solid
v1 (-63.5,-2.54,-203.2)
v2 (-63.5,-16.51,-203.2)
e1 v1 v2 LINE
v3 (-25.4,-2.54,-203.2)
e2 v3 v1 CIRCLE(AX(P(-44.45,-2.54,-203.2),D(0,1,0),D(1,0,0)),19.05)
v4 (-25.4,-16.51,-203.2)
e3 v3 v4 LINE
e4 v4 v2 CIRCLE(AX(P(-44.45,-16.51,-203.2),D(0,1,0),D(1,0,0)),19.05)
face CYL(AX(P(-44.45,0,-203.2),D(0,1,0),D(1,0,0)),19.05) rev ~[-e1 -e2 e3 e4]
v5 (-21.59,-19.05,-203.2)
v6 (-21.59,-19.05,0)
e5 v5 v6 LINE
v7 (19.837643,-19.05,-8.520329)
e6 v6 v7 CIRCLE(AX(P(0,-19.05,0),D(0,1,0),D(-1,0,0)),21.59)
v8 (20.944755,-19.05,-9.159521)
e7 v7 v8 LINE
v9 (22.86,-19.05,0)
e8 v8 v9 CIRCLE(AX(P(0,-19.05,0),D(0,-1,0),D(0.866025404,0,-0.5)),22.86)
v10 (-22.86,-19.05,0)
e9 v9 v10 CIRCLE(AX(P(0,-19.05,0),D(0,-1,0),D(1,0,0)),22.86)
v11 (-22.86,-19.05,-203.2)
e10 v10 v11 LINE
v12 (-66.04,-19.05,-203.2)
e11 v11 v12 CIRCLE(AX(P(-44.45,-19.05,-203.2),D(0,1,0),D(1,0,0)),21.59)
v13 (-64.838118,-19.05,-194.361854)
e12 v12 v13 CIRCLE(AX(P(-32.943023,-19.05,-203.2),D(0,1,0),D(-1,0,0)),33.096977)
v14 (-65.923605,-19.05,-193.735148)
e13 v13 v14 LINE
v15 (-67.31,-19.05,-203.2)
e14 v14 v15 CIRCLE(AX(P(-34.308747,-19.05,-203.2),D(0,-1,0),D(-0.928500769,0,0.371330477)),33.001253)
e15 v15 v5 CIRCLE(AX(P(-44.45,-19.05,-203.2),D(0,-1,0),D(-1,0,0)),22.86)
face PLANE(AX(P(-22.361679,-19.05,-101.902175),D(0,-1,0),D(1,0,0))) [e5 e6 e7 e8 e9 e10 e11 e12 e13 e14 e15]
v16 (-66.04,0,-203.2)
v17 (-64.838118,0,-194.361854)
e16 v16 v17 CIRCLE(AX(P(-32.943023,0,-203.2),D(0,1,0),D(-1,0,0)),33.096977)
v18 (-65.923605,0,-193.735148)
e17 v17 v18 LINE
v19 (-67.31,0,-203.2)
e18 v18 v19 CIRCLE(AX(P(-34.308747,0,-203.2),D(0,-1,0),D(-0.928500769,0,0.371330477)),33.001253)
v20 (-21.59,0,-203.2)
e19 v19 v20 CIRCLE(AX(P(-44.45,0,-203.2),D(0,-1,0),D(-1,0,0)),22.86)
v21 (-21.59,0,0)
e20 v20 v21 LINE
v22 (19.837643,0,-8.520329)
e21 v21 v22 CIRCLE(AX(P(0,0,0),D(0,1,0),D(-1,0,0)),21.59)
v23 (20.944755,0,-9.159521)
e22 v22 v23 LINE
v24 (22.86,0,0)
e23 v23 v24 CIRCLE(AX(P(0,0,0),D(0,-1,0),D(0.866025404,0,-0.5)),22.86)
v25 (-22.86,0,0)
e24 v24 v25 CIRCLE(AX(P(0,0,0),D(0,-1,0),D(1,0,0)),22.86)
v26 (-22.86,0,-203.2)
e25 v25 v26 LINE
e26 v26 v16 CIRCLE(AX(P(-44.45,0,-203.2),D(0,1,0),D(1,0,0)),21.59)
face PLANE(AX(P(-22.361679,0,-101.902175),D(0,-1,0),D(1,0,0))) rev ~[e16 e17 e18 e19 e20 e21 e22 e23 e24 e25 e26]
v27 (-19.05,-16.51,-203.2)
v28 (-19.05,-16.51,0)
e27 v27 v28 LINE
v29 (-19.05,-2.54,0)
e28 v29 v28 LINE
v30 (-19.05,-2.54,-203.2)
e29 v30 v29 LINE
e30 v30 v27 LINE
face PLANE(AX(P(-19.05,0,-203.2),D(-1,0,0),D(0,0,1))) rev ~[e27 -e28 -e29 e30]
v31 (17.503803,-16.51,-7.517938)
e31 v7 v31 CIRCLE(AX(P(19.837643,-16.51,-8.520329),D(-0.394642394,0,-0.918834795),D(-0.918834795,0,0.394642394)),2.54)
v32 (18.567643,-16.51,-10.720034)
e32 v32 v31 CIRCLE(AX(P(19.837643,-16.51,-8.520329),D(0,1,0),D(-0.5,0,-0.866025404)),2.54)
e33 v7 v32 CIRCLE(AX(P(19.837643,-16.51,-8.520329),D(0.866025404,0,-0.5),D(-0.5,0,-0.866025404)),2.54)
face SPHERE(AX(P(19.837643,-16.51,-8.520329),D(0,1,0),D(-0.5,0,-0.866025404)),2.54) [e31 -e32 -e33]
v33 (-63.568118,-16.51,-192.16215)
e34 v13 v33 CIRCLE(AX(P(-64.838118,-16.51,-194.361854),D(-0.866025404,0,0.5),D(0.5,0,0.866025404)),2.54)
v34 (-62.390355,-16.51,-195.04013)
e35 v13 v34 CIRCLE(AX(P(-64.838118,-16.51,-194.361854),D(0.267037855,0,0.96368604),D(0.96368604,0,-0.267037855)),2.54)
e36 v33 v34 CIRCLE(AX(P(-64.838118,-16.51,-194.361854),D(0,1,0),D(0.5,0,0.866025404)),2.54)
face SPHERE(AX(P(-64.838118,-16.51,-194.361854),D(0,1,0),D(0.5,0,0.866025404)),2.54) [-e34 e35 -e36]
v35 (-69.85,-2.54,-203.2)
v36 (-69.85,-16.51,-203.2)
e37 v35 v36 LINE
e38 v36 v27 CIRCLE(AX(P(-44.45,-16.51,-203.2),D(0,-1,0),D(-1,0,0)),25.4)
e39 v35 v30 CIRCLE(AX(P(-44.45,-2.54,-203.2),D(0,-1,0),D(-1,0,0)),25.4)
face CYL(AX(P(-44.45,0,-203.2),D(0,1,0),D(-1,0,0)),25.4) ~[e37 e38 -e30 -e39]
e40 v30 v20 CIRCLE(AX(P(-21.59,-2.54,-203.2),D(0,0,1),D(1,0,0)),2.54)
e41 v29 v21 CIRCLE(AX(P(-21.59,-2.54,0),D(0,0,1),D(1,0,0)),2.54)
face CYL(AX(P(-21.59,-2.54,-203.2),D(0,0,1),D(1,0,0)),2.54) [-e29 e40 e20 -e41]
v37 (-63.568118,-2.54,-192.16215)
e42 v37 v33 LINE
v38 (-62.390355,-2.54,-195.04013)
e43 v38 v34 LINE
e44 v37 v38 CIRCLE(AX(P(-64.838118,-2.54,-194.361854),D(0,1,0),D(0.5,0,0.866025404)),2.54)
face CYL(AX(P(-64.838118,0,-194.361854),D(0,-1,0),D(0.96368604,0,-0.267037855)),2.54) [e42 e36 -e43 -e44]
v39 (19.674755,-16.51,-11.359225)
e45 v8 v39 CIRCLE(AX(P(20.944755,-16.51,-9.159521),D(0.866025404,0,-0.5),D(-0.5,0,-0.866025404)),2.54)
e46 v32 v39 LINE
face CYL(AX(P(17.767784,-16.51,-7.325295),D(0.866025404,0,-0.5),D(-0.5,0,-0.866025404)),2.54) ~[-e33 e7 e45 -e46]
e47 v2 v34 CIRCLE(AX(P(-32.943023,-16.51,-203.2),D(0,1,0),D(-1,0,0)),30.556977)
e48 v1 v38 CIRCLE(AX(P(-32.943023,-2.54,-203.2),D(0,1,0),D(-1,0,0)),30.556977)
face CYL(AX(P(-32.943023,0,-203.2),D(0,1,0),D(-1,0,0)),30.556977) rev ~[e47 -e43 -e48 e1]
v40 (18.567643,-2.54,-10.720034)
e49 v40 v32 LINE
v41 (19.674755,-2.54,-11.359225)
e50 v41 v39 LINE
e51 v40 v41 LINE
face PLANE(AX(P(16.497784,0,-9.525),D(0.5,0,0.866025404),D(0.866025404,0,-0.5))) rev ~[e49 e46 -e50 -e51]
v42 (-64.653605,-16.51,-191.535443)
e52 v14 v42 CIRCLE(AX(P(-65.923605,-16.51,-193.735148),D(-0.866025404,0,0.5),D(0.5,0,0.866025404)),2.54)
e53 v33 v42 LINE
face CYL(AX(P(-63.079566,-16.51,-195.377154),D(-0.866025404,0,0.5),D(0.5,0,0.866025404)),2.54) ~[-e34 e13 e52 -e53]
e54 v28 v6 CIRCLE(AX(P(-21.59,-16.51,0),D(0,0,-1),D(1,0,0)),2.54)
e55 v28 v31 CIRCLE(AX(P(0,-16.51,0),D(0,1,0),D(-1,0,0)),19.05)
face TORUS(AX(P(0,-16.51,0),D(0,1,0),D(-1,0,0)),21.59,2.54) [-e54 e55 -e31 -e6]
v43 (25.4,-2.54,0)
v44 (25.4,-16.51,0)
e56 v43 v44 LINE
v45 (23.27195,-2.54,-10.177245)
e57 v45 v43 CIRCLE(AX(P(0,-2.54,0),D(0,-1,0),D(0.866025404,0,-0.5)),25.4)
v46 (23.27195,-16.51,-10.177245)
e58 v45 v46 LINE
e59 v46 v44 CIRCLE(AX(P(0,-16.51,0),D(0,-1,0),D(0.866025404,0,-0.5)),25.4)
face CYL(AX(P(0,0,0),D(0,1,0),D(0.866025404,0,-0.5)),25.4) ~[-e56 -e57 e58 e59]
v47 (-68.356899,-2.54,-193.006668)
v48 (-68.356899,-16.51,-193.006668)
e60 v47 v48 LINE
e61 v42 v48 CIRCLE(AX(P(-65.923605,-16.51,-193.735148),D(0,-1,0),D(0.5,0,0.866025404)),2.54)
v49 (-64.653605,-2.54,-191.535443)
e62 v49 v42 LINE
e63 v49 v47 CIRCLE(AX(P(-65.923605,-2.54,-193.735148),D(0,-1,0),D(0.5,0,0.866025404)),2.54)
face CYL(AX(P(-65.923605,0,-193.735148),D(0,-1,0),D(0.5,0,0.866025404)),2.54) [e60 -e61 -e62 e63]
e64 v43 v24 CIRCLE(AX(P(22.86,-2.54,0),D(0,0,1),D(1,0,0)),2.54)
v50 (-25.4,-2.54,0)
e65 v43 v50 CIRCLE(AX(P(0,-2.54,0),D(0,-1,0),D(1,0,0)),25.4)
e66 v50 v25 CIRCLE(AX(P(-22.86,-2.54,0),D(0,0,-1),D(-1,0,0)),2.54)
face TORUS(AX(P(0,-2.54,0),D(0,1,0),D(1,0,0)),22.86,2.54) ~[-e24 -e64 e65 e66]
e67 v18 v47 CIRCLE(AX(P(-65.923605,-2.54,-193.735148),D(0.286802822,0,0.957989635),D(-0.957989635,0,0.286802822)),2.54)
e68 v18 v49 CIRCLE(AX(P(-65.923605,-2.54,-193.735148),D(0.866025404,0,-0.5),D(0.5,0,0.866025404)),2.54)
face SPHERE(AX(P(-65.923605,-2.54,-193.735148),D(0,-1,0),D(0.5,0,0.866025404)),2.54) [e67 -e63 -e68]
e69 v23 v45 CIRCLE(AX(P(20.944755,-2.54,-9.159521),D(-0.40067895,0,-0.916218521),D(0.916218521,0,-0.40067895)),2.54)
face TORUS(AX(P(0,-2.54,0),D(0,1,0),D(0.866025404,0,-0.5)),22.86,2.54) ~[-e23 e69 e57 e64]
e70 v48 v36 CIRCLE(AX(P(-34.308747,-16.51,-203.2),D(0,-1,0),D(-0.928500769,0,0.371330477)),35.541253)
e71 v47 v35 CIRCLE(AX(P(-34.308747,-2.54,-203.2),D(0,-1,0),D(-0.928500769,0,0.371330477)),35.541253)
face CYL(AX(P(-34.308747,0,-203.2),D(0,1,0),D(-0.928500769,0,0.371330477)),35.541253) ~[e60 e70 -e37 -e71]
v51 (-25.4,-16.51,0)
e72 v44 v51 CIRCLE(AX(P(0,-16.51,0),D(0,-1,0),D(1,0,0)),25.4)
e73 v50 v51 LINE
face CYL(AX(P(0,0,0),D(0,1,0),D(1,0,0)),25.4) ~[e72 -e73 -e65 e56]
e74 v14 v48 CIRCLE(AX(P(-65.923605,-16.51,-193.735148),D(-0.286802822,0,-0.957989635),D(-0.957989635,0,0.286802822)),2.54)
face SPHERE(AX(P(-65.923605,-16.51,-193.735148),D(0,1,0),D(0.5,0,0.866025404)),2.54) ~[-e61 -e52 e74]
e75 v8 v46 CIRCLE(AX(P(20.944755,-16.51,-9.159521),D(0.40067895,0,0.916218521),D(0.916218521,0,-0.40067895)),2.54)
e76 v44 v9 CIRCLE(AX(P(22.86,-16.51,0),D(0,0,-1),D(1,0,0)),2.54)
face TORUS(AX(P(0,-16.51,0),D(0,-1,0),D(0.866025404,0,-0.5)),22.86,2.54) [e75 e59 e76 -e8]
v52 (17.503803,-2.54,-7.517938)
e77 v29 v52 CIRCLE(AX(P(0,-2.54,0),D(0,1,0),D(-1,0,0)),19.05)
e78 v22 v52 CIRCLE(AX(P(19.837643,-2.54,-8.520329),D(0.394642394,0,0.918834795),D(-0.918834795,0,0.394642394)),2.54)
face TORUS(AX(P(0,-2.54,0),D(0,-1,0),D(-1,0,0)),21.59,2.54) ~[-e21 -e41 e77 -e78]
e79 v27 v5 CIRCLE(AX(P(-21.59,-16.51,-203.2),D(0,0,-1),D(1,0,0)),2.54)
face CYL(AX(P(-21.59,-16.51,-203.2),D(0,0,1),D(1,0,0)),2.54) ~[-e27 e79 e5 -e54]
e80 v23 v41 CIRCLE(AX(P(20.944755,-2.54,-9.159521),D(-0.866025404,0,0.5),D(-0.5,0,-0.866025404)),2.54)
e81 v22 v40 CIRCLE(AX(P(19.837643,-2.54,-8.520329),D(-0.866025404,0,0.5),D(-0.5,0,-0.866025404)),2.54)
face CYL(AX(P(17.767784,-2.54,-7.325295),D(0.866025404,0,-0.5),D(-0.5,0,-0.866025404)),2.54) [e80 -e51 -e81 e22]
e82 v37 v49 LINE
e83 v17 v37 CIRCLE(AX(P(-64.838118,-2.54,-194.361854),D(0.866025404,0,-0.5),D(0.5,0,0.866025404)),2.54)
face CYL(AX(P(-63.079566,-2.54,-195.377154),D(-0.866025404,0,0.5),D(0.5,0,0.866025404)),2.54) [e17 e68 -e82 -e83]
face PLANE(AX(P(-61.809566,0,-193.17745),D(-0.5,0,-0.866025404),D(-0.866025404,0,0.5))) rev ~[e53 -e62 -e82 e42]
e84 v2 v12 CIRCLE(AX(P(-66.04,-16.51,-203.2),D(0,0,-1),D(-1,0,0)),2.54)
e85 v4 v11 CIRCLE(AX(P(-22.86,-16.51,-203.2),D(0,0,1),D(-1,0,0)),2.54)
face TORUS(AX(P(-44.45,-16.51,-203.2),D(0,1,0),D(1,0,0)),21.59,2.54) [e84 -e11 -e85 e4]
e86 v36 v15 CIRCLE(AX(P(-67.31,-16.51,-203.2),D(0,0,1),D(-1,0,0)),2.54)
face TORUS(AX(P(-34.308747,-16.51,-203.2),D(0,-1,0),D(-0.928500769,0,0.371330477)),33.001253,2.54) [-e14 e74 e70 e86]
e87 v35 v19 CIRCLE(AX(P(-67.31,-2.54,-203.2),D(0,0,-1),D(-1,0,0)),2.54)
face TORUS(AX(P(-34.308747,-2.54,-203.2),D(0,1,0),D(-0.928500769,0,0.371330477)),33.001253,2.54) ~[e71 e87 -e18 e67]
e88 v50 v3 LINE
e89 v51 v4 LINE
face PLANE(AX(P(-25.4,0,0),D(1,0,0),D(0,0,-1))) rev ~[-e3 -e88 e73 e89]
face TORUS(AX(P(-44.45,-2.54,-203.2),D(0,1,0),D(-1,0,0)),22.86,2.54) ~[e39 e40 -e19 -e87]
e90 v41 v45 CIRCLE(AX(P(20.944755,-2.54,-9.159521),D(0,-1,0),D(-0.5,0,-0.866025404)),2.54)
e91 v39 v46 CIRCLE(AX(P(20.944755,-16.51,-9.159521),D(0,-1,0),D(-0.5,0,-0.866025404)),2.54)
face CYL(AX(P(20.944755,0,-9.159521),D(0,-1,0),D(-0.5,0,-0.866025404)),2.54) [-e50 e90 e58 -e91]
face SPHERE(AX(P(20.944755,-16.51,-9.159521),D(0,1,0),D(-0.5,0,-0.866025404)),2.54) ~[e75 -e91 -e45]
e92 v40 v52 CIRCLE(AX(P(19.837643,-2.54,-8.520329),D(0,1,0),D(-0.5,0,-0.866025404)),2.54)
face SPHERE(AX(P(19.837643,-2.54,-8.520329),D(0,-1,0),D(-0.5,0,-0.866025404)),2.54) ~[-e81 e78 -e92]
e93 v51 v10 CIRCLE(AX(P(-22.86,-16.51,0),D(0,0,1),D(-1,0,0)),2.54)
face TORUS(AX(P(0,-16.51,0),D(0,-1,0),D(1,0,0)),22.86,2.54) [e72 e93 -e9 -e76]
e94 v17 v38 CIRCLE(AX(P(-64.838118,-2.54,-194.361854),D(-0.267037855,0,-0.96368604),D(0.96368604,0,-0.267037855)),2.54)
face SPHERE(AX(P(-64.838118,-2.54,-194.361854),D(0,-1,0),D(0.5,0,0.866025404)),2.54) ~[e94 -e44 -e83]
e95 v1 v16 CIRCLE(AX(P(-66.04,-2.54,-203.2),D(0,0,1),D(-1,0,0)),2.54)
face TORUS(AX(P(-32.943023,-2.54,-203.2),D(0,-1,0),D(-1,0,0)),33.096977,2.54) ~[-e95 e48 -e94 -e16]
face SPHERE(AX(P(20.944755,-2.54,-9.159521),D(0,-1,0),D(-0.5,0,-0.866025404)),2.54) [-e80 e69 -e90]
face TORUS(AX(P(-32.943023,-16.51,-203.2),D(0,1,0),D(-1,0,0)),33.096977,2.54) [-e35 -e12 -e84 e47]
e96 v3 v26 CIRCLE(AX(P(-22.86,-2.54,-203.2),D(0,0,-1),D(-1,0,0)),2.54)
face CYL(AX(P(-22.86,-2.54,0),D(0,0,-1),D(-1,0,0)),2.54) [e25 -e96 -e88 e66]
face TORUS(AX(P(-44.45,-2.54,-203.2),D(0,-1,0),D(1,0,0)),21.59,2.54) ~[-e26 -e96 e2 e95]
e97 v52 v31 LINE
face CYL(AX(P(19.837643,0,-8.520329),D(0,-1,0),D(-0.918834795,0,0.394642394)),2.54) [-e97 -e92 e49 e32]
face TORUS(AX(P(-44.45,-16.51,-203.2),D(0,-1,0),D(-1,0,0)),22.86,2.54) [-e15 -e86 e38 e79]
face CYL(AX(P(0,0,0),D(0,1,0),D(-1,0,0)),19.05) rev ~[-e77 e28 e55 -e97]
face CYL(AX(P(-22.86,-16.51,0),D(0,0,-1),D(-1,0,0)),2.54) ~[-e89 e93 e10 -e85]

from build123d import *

# Parameters (mm, degrees)
F1_DEPTH = 19.05
F2_R     = 2.54


# Not quite as in the source:
# - a feature names something its author has since deleted; it is built from what else it names


with BuildPart() as f1:
    # F0 (on Front) → F1 (new body)
    with BuildSketch(Plane.XZ):
        with BuildLine():
            ThreePointArc((25.4, 0), (0, 25.4), (-25.4, 0))
            Line((-25.4, 0), (-25.4, -203.2))
            ThreePointArc((-25.4, -203.2), (-44.45, -222.25), (-63.5, -203.2))
            ThreePointArc((-63.5, -203.2), (-63.0744281022, -198.1179462529), (-61.8095664242, -193.177449652))
            Line((-61.8095664242, -193.177449652), (-67.3088277382, -190.002449652))
            ThreePointArc((-67.3088277382, -190.002449652), (-69.208925247, -196.4800131761), (-69.85, -203.2))
            ThreePointArc((-69.85, -203.2), (-44.45, -228.6), (-19.05, -203.2))
            Line((-19.05, -203.2), (-19.05, 0))
            ThreePointArc((-19.05, 0), (4.9305028092, 18.4008869908), (16.4977839421, -9.525))
            Line((16.4977839421, -9.525), (21.9970452561, -12.7))
            ThreePointArc((21.9970452561, -12.7), (24.5345159877, -6.5740037456), (25.4, 0))
        make_face()
    extrude(amount=F1_DEPTH)

    # F2
    f2_edges = [f1.edges().sort_by_distance(p)[0] for p in [
        (-61.809566, -9.525, -193.17745),
        (-67.308828, -9.525, -190.00245),
        (-64.559197, 0, -191.58995),
        (-64.559197, -19.05, -191.58995),
        (16.497784, -9.525, -9.525),
        (21.997045, -9.525, -12.7),
        (19.247415, 0, -11.1125),
        (19.247415, -19.05, -11.1125),
        (-19.05, 0, -101.6),
        (4.930503, 0, 18.400887),
        (6.574004, 0, 24.534516),
        (-25.4, 0, -101.6),
        (-44.45, 0, -222.25),
        (-63.074428, 0, -198.117946),
        (-69.208925, 0, -196.480013),
        (-44.45, 0, -228.6),
        (-19.05, -19.05, -101.6),
        (4.930503, -19.05, 18.400887),
        (6.574004, -19.05, 24.534516),
        (-25.4, -19.05, -101.6),
        (-44.45, -19.05, -222.25),
        (-63.074428, -19.05, -198.117946),
        (-69.208925, -19.05, -196.480013),
        (-44.45, -19.05, -228.6),
    ]]
    fillet(f2_edges, radius=F2_R)


solid = f1.part
